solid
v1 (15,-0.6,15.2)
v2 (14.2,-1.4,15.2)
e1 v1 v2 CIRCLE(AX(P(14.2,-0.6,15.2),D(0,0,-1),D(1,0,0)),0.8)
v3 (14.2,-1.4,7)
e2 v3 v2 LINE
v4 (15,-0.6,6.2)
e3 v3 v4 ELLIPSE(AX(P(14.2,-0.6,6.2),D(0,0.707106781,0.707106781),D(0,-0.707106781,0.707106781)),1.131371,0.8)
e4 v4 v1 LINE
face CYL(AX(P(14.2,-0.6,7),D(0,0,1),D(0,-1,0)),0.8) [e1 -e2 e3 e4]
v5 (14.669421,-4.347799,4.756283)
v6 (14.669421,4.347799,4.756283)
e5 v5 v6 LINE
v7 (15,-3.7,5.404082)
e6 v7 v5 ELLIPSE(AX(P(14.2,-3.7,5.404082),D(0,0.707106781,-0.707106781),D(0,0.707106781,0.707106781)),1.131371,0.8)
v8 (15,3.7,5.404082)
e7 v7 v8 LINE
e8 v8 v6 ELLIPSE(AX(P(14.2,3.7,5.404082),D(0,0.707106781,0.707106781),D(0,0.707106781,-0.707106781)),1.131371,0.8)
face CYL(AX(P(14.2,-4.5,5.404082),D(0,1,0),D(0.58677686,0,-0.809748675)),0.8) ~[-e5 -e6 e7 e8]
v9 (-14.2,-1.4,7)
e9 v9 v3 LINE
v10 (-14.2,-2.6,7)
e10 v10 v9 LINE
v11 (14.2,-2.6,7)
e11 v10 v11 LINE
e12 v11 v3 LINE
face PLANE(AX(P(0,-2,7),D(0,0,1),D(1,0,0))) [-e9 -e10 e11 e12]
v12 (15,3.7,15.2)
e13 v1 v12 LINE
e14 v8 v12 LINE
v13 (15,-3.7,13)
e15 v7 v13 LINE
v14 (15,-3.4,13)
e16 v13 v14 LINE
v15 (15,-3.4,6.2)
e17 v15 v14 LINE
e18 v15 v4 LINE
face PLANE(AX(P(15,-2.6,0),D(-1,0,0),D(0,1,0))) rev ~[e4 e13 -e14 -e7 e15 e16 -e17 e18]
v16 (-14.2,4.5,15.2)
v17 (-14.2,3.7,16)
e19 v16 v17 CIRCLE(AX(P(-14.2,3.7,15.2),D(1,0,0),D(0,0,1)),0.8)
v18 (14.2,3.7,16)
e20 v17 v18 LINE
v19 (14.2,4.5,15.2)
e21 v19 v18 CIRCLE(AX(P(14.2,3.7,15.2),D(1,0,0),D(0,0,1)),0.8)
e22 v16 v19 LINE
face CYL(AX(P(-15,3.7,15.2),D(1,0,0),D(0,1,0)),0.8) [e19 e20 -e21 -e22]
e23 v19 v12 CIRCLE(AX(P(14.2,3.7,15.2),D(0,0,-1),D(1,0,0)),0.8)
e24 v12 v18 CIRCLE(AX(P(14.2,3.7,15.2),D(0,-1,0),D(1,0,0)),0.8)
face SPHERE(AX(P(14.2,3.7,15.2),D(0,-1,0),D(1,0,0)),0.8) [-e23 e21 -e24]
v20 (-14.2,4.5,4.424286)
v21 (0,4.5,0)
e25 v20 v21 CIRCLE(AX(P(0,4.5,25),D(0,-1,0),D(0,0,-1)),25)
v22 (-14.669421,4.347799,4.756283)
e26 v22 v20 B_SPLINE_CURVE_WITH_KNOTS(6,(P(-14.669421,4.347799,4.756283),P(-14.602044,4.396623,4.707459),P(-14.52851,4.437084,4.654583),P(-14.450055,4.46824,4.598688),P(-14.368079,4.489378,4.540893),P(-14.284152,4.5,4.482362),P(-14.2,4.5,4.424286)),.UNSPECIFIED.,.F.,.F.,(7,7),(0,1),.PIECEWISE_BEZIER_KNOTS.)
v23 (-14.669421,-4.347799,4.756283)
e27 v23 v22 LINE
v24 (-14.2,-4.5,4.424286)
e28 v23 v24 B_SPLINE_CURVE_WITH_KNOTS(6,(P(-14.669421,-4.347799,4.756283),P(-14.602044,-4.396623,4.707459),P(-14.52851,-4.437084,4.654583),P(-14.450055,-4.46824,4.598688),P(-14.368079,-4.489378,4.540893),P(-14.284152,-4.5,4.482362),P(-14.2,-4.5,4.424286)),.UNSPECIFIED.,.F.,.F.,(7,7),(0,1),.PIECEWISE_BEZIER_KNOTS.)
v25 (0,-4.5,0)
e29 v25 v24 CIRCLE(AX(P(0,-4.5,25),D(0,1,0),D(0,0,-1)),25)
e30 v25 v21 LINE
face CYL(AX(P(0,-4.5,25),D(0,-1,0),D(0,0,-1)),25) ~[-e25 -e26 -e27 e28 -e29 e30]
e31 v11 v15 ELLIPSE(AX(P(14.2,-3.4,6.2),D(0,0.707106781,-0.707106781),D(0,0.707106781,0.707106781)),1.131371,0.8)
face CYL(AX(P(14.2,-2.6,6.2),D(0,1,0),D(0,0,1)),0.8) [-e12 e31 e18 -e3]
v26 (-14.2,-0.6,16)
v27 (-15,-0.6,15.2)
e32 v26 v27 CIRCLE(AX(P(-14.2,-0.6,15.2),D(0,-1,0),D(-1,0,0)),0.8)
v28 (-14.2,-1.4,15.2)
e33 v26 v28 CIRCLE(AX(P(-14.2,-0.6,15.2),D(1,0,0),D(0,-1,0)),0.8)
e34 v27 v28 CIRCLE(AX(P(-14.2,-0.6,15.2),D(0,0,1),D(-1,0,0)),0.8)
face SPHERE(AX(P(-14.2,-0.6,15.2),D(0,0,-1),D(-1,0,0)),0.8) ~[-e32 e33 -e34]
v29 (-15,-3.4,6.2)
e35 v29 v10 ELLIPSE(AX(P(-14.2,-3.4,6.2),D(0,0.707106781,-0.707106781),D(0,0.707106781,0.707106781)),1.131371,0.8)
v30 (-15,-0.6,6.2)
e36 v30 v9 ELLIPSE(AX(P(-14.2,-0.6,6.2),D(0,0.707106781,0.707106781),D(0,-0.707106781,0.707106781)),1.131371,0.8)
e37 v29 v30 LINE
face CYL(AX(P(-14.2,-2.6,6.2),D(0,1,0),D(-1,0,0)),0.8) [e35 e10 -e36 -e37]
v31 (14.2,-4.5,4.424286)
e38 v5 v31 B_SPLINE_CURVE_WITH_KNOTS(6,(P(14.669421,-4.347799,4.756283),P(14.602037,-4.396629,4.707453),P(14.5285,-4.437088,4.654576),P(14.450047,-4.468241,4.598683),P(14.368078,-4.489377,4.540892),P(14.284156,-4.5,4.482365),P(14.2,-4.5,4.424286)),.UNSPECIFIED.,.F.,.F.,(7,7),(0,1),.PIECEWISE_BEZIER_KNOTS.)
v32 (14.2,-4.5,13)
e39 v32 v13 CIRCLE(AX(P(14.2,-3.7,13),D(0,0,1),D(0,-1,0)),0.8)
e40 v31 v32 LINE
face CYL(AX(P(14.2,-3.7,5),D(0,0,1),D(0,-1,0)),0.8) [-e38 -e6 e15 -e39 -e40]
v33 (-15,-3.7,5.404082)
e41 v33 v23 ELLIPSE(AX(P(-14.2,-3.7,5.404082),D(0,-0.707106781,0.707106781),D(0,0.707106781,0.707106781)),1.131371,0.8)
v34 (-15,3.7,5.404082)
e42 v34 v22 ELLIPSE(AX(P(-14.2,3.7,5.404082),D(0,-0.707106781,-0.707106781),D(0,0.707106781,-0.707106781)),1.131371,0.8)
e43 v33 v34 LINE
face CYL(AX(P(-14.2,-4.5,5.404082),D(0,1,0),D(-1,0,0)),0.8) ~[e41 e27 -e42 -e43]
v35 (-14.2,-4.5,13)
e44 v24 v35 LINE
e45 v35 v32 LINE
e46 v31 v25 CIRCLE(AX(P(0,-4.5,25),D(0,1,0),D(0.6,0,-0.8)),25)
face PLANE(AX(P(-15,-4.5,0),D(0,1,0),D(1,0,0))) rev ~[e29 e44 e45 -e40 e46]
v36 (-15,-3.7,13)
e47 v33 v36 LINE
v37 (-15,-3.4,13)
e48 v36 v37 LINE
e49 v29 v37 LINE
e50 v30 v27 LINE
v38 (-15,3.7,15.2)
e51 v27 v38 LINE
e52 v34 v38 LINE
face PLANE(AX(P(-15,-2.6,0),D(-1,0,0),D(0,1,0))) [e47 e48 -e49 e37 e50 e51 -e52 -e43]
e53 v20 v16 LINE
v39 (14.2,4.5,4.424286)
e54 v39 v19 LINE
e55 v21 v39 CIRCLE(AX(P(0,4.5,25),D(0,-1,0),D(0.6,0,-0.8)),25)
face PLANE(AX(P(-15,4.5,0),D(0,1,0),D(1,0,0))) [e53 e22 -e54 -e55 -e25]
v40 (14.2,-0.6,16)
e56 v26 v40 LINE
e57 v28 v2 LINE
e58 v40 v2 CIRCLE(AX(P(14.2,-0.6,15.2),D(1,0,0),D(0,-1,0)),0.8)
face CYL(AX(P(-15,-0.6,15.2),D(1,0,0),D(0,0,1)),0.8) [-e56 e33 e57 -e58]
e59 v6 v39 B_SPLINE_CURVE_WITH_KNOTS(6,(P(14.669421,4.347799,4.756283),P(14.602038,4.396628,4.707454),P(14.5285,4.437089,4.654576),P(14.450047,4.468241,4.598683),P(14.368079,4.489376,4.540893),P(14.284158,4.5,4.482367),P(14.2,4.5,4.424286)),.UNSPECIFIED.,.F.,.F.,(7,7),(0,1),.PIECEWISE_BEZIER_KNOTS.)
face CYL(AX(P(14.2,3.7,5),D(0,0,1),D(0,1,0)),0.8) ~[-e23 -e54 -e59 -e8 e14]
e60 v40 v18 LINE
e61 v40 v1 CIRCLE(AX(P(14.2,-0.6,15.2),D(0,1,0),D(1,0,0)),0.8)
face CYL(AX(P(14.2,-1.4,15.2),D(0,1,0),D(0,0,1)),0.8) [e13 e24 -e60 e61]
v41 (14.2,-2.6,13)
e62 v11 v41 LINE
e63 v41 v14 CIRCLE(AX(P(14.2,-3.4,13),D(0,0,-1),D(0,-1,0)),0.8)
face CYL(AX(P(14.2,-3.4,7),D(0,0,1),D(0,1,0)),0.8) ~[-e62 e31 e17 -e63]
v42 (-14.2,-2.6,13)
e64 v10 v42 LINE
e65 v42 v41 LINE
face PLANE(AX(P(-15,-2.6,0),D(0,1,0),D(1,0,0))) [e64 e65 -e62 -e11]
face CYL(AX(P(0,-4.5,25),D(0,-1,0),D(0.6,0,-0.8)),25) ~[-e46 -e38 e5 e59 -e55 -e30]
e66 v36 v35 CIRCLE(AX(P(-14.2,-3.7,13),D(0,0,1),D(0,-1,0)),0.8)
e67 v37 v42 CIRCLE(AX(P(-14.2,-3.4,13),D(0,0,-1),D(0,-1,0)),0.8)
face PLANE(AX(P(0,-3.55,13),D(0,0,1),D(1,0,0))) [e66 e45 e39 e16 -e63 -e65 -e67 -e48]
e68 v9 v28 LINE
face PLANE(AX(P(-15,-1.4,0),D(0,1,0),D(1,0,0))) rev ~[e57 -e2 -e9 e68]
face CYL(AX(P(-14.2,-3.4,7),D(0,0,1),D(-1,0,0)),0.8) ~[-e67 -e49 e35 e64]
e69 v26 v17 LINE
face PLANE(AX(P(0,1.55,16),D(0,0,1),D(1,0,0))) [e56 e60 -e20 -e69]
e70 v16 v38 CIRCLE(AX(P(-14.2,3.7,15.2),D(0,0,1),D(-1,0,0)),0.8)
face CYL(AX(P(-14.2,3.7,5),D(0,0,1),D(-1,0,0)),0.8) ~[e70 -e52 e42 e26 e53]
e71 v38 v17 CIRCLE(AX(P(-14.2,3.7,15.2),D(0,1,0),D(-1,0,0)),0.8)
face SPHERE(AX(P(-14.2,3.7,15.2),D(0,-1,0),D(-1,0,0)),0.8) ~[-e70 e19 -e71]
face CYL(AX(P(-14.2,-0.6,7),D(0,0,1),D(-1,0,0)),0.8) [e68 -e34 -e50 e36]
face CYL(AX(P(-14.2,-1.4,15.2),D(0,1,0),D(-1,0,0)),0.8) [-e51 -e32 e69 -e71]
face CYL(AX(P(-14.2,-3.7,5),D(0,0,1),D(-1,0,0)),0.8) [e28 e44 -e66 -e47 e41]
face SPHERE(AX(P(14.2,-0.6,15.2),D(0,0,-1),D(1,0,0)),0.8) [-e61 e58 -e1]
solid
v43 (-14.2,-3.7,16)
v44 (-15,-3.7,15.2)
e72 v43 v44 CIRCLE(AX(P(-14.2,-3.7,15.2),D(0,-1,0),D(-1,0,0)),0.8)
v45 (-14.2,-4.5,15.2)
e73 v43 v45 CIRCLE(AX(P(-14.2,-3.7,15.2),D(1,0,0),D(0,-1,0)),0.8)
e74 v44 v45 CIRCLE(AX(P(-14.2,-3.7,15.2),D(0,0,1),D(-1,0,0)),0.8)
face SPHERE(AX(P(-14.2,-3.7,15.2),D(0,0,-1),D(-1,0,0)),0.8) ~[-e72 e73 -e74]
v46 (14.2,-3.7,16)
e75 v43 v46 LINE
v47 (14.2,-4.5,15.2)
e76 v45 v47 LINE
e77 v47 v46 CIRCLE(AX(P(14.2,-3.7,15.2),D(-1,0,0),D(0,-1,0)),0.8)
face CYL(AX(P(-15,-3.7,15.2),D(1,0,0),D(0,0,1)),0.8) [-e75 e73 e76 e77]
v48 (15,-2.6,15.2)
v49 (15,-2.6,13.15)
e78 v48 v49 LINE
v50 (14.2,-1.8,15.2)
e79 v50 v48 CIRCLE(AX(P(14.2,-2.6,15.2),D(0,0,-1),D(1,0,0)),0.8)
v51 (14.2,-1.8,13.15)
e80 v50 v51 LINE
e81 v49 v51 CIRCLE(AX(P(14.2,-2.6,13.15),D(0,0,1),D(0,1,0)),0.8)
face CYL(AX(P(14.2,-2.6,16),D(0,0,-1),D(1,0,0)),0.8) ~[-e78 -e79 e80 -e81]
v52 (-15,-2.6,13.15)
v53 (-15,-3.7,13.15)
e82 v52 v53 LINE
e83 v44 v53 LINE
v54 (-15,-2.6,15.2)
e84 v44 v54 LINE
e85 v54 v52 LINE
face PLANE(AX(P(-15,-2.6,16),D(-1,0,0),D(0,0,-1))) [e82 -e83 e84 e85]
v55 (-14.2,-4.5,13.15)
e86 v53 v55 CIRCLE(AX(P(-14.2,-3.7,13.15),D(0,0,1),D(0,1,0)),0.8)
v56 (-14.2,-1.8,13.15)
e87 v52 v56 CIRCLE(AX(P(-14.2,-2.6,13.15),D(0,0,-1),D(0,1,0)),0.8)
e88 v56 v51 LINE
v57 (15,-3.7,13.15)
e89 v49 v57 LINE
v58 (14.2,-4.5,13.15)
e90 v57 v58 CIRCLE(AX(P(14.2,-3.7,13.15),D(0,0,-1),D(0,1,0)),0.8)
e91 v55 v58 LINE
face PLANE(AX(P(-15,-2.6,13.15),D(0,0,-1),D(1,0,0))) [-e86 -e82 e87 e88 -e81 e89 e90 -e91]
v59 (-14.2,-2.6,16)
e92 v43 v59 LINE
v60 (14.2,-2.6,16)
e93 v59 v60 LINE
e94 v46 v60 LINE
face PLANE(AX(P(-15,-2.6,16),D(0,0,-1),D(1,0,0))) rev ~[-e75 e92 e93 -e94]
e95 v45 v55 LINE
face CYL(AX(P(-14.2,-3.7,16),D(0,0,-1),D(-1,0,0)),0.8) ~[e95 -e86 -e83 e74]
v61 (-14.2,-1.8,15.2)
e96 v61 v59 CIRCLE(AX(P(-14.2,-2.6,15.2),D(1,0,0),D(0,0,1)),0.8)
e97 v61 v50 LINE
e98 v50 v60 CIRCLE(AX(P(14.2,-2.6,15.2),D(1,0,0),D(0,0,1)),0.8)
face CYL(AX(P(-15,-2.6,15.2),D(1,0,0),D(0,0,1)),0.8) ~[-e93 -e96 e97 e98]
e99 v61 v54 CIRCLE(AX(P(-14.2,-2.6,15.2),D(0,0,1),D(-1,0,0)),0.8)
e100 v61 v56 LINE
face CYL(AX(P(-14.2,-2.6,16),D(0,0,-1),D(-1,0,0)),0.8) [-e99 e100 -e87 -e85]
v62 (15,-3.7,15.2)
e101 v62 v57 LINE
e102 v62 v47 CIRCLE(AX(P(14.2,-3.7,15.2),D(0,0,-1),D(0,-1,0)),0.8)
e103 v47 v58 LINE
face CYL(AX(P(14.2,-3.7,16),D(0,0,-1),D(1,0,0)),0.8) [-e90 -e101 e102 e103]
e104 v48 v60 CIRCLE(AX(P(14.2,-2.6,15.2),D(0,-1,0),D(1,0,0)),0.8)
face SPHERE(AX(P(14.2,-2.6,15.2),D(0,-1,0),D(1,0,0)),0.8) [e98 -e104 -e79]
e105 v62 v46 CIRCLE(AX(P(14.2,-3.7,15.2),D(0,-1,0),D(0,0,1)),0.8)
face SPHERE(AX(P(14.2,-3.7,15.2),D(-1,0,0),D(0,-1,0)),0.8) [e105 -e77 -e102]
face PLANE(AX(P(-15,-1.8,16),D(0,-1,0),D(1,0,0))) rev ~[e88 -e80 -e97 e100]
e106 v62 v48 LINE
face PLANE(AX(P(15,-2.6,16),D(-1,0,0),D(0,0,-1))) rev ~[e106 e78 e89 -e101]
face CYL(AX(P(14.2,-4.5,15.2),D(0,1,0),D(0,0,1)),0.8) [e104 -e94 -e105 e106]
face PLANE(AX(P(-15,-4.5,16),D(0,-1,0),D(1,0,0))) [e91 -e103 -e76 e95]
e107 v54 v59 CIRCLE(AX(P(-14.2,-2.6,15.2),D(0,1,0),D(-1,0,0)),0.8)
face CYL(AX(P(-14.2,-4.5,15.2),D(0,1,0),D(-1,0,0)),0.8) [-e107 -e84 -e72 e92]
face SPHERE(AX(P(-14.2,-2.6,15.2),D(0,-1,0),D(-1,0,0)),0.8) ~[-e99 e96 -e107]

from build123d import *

# Parameters (mm, degrees)
F0_W     = 30
F0_H     = 5.9
F1_DEPTH = 16
F0_H_2   = 1.9
F2_DEPTH = 13
F0_H_3   = 1.2
F3_DEPTH = 7
F5_DEPTH = 9.001
F6_W     = 30
F6_H     = 1.9
F7_DEPTH = 2.85
F8_DEPTH = 0.8
F9_R     = 0.8
F9_2_R   = 0.8


with BuildPart() as f1:
    # F0 (on Top) → F1 (new body)
    with BuildSketch(Plane.XY):
        with Locations((0, 1.55)):
            Rectangle(F0_W, F0_H)
    extrude(amount=F1_DEPTH)



with BuildPart() as f2:
    # F0 (on Top) → F2 (new body)
    with BuildSketch(Plane.XY):
        with Locations((0, -3.55)):
            Rectangle(F0_W, F0_H_2)
    extrude(amount=F2_DEPTH)


with BuildPart() as f1_1:
    add(f1.part)

    add(f2.part)  # F3 merges F2
    # F0 (on Top) → F3 (join)
    with BuildSketch(Plane.XY):
        with Locations((0, -2)):
            Rectangle(F0_W, F0_H_3)
    extrude(amount=F3_DEPTH)

    # F4 (on face) → F5 (cut, through all)
    with BuildSketch(Plane.XZ.offset(4.5)):
        with BuildLine():
            ThreePointArc((0, 0), (-7.9056941504, 1.2829175487), (-15, 5))
            Line((-15, 5), (-15, 0))
            Line((-15, 0), (0, 0))
        make_face()
        with BuildLine():
            ThreePointArc((15, 5), (7.9056941504, 1.2829175487), (0, 0))
            Line((0, 0), (15, 0))
            Line((15, 0), (15, 5))
        make_face()
    extrude(amount=-F5_DEPTH, mode=Mode.SUBTRACT)

    # F9
    f9_edges = [f1_1.edges().sort_by_distance(p)[0] for p in [
        (-15, 0, 5),
        (15, 0, 5),
        (-15, -4.5, 9),
        (-15, -2.6, 10),
        (-15, -1.4, 11.5),
        (-15, -2, 7),
        (-15, 1.55, 16),
        (15, -1.4, 11.5),
        (15, -2.6, 10),
        (15, -4.5, 9),
        (15, -2, 7),
        (15, 1.55, 16),
        (0, -1.4, 16),
        (-15, 4.5, 10.5),
        (15, 4.5, 10.5),
        (0, 4.5, 16),
    ]]
    fillet(f9_edges, radius=F9_R)


with BuildPart() as f7:
    # F6 (on face) → F7 (new body, through all)
    with BuildSketch(Plane.XY.offset(16)):
        with Locations((0, -3.55)):
            Rectangle(F6_W, F6_H)
    extrude(amount=-F7_DEPTH)

    # F8 (add, through all): a face of the model
    f8_faces = [f7.faces().sort_by_distance(p)[0] for p in [
        (0, -2.6, 14.575),
    ]]
    extrude(f8_faces, amount=F8_DEPTH)

    # F9#2
    f9_2_edges = [f7.edges().sort_by_distance(p)[0] for p in [
        (-15, -4.5, 14.575),
        (-15, -3.15, 16),
        (0, -4.5, 16),
        (15, -4.5, 14.575),
        (15, -3.15, 16),
        (-15, -1.8, 14.575),
        (15, -1.8, 14.575),
        (0, -1.8, 16),
    ]]
    fillet(f9_2_edges, radius=F9_2_R)


solid = Compound([f1_1.part, f7.part])
